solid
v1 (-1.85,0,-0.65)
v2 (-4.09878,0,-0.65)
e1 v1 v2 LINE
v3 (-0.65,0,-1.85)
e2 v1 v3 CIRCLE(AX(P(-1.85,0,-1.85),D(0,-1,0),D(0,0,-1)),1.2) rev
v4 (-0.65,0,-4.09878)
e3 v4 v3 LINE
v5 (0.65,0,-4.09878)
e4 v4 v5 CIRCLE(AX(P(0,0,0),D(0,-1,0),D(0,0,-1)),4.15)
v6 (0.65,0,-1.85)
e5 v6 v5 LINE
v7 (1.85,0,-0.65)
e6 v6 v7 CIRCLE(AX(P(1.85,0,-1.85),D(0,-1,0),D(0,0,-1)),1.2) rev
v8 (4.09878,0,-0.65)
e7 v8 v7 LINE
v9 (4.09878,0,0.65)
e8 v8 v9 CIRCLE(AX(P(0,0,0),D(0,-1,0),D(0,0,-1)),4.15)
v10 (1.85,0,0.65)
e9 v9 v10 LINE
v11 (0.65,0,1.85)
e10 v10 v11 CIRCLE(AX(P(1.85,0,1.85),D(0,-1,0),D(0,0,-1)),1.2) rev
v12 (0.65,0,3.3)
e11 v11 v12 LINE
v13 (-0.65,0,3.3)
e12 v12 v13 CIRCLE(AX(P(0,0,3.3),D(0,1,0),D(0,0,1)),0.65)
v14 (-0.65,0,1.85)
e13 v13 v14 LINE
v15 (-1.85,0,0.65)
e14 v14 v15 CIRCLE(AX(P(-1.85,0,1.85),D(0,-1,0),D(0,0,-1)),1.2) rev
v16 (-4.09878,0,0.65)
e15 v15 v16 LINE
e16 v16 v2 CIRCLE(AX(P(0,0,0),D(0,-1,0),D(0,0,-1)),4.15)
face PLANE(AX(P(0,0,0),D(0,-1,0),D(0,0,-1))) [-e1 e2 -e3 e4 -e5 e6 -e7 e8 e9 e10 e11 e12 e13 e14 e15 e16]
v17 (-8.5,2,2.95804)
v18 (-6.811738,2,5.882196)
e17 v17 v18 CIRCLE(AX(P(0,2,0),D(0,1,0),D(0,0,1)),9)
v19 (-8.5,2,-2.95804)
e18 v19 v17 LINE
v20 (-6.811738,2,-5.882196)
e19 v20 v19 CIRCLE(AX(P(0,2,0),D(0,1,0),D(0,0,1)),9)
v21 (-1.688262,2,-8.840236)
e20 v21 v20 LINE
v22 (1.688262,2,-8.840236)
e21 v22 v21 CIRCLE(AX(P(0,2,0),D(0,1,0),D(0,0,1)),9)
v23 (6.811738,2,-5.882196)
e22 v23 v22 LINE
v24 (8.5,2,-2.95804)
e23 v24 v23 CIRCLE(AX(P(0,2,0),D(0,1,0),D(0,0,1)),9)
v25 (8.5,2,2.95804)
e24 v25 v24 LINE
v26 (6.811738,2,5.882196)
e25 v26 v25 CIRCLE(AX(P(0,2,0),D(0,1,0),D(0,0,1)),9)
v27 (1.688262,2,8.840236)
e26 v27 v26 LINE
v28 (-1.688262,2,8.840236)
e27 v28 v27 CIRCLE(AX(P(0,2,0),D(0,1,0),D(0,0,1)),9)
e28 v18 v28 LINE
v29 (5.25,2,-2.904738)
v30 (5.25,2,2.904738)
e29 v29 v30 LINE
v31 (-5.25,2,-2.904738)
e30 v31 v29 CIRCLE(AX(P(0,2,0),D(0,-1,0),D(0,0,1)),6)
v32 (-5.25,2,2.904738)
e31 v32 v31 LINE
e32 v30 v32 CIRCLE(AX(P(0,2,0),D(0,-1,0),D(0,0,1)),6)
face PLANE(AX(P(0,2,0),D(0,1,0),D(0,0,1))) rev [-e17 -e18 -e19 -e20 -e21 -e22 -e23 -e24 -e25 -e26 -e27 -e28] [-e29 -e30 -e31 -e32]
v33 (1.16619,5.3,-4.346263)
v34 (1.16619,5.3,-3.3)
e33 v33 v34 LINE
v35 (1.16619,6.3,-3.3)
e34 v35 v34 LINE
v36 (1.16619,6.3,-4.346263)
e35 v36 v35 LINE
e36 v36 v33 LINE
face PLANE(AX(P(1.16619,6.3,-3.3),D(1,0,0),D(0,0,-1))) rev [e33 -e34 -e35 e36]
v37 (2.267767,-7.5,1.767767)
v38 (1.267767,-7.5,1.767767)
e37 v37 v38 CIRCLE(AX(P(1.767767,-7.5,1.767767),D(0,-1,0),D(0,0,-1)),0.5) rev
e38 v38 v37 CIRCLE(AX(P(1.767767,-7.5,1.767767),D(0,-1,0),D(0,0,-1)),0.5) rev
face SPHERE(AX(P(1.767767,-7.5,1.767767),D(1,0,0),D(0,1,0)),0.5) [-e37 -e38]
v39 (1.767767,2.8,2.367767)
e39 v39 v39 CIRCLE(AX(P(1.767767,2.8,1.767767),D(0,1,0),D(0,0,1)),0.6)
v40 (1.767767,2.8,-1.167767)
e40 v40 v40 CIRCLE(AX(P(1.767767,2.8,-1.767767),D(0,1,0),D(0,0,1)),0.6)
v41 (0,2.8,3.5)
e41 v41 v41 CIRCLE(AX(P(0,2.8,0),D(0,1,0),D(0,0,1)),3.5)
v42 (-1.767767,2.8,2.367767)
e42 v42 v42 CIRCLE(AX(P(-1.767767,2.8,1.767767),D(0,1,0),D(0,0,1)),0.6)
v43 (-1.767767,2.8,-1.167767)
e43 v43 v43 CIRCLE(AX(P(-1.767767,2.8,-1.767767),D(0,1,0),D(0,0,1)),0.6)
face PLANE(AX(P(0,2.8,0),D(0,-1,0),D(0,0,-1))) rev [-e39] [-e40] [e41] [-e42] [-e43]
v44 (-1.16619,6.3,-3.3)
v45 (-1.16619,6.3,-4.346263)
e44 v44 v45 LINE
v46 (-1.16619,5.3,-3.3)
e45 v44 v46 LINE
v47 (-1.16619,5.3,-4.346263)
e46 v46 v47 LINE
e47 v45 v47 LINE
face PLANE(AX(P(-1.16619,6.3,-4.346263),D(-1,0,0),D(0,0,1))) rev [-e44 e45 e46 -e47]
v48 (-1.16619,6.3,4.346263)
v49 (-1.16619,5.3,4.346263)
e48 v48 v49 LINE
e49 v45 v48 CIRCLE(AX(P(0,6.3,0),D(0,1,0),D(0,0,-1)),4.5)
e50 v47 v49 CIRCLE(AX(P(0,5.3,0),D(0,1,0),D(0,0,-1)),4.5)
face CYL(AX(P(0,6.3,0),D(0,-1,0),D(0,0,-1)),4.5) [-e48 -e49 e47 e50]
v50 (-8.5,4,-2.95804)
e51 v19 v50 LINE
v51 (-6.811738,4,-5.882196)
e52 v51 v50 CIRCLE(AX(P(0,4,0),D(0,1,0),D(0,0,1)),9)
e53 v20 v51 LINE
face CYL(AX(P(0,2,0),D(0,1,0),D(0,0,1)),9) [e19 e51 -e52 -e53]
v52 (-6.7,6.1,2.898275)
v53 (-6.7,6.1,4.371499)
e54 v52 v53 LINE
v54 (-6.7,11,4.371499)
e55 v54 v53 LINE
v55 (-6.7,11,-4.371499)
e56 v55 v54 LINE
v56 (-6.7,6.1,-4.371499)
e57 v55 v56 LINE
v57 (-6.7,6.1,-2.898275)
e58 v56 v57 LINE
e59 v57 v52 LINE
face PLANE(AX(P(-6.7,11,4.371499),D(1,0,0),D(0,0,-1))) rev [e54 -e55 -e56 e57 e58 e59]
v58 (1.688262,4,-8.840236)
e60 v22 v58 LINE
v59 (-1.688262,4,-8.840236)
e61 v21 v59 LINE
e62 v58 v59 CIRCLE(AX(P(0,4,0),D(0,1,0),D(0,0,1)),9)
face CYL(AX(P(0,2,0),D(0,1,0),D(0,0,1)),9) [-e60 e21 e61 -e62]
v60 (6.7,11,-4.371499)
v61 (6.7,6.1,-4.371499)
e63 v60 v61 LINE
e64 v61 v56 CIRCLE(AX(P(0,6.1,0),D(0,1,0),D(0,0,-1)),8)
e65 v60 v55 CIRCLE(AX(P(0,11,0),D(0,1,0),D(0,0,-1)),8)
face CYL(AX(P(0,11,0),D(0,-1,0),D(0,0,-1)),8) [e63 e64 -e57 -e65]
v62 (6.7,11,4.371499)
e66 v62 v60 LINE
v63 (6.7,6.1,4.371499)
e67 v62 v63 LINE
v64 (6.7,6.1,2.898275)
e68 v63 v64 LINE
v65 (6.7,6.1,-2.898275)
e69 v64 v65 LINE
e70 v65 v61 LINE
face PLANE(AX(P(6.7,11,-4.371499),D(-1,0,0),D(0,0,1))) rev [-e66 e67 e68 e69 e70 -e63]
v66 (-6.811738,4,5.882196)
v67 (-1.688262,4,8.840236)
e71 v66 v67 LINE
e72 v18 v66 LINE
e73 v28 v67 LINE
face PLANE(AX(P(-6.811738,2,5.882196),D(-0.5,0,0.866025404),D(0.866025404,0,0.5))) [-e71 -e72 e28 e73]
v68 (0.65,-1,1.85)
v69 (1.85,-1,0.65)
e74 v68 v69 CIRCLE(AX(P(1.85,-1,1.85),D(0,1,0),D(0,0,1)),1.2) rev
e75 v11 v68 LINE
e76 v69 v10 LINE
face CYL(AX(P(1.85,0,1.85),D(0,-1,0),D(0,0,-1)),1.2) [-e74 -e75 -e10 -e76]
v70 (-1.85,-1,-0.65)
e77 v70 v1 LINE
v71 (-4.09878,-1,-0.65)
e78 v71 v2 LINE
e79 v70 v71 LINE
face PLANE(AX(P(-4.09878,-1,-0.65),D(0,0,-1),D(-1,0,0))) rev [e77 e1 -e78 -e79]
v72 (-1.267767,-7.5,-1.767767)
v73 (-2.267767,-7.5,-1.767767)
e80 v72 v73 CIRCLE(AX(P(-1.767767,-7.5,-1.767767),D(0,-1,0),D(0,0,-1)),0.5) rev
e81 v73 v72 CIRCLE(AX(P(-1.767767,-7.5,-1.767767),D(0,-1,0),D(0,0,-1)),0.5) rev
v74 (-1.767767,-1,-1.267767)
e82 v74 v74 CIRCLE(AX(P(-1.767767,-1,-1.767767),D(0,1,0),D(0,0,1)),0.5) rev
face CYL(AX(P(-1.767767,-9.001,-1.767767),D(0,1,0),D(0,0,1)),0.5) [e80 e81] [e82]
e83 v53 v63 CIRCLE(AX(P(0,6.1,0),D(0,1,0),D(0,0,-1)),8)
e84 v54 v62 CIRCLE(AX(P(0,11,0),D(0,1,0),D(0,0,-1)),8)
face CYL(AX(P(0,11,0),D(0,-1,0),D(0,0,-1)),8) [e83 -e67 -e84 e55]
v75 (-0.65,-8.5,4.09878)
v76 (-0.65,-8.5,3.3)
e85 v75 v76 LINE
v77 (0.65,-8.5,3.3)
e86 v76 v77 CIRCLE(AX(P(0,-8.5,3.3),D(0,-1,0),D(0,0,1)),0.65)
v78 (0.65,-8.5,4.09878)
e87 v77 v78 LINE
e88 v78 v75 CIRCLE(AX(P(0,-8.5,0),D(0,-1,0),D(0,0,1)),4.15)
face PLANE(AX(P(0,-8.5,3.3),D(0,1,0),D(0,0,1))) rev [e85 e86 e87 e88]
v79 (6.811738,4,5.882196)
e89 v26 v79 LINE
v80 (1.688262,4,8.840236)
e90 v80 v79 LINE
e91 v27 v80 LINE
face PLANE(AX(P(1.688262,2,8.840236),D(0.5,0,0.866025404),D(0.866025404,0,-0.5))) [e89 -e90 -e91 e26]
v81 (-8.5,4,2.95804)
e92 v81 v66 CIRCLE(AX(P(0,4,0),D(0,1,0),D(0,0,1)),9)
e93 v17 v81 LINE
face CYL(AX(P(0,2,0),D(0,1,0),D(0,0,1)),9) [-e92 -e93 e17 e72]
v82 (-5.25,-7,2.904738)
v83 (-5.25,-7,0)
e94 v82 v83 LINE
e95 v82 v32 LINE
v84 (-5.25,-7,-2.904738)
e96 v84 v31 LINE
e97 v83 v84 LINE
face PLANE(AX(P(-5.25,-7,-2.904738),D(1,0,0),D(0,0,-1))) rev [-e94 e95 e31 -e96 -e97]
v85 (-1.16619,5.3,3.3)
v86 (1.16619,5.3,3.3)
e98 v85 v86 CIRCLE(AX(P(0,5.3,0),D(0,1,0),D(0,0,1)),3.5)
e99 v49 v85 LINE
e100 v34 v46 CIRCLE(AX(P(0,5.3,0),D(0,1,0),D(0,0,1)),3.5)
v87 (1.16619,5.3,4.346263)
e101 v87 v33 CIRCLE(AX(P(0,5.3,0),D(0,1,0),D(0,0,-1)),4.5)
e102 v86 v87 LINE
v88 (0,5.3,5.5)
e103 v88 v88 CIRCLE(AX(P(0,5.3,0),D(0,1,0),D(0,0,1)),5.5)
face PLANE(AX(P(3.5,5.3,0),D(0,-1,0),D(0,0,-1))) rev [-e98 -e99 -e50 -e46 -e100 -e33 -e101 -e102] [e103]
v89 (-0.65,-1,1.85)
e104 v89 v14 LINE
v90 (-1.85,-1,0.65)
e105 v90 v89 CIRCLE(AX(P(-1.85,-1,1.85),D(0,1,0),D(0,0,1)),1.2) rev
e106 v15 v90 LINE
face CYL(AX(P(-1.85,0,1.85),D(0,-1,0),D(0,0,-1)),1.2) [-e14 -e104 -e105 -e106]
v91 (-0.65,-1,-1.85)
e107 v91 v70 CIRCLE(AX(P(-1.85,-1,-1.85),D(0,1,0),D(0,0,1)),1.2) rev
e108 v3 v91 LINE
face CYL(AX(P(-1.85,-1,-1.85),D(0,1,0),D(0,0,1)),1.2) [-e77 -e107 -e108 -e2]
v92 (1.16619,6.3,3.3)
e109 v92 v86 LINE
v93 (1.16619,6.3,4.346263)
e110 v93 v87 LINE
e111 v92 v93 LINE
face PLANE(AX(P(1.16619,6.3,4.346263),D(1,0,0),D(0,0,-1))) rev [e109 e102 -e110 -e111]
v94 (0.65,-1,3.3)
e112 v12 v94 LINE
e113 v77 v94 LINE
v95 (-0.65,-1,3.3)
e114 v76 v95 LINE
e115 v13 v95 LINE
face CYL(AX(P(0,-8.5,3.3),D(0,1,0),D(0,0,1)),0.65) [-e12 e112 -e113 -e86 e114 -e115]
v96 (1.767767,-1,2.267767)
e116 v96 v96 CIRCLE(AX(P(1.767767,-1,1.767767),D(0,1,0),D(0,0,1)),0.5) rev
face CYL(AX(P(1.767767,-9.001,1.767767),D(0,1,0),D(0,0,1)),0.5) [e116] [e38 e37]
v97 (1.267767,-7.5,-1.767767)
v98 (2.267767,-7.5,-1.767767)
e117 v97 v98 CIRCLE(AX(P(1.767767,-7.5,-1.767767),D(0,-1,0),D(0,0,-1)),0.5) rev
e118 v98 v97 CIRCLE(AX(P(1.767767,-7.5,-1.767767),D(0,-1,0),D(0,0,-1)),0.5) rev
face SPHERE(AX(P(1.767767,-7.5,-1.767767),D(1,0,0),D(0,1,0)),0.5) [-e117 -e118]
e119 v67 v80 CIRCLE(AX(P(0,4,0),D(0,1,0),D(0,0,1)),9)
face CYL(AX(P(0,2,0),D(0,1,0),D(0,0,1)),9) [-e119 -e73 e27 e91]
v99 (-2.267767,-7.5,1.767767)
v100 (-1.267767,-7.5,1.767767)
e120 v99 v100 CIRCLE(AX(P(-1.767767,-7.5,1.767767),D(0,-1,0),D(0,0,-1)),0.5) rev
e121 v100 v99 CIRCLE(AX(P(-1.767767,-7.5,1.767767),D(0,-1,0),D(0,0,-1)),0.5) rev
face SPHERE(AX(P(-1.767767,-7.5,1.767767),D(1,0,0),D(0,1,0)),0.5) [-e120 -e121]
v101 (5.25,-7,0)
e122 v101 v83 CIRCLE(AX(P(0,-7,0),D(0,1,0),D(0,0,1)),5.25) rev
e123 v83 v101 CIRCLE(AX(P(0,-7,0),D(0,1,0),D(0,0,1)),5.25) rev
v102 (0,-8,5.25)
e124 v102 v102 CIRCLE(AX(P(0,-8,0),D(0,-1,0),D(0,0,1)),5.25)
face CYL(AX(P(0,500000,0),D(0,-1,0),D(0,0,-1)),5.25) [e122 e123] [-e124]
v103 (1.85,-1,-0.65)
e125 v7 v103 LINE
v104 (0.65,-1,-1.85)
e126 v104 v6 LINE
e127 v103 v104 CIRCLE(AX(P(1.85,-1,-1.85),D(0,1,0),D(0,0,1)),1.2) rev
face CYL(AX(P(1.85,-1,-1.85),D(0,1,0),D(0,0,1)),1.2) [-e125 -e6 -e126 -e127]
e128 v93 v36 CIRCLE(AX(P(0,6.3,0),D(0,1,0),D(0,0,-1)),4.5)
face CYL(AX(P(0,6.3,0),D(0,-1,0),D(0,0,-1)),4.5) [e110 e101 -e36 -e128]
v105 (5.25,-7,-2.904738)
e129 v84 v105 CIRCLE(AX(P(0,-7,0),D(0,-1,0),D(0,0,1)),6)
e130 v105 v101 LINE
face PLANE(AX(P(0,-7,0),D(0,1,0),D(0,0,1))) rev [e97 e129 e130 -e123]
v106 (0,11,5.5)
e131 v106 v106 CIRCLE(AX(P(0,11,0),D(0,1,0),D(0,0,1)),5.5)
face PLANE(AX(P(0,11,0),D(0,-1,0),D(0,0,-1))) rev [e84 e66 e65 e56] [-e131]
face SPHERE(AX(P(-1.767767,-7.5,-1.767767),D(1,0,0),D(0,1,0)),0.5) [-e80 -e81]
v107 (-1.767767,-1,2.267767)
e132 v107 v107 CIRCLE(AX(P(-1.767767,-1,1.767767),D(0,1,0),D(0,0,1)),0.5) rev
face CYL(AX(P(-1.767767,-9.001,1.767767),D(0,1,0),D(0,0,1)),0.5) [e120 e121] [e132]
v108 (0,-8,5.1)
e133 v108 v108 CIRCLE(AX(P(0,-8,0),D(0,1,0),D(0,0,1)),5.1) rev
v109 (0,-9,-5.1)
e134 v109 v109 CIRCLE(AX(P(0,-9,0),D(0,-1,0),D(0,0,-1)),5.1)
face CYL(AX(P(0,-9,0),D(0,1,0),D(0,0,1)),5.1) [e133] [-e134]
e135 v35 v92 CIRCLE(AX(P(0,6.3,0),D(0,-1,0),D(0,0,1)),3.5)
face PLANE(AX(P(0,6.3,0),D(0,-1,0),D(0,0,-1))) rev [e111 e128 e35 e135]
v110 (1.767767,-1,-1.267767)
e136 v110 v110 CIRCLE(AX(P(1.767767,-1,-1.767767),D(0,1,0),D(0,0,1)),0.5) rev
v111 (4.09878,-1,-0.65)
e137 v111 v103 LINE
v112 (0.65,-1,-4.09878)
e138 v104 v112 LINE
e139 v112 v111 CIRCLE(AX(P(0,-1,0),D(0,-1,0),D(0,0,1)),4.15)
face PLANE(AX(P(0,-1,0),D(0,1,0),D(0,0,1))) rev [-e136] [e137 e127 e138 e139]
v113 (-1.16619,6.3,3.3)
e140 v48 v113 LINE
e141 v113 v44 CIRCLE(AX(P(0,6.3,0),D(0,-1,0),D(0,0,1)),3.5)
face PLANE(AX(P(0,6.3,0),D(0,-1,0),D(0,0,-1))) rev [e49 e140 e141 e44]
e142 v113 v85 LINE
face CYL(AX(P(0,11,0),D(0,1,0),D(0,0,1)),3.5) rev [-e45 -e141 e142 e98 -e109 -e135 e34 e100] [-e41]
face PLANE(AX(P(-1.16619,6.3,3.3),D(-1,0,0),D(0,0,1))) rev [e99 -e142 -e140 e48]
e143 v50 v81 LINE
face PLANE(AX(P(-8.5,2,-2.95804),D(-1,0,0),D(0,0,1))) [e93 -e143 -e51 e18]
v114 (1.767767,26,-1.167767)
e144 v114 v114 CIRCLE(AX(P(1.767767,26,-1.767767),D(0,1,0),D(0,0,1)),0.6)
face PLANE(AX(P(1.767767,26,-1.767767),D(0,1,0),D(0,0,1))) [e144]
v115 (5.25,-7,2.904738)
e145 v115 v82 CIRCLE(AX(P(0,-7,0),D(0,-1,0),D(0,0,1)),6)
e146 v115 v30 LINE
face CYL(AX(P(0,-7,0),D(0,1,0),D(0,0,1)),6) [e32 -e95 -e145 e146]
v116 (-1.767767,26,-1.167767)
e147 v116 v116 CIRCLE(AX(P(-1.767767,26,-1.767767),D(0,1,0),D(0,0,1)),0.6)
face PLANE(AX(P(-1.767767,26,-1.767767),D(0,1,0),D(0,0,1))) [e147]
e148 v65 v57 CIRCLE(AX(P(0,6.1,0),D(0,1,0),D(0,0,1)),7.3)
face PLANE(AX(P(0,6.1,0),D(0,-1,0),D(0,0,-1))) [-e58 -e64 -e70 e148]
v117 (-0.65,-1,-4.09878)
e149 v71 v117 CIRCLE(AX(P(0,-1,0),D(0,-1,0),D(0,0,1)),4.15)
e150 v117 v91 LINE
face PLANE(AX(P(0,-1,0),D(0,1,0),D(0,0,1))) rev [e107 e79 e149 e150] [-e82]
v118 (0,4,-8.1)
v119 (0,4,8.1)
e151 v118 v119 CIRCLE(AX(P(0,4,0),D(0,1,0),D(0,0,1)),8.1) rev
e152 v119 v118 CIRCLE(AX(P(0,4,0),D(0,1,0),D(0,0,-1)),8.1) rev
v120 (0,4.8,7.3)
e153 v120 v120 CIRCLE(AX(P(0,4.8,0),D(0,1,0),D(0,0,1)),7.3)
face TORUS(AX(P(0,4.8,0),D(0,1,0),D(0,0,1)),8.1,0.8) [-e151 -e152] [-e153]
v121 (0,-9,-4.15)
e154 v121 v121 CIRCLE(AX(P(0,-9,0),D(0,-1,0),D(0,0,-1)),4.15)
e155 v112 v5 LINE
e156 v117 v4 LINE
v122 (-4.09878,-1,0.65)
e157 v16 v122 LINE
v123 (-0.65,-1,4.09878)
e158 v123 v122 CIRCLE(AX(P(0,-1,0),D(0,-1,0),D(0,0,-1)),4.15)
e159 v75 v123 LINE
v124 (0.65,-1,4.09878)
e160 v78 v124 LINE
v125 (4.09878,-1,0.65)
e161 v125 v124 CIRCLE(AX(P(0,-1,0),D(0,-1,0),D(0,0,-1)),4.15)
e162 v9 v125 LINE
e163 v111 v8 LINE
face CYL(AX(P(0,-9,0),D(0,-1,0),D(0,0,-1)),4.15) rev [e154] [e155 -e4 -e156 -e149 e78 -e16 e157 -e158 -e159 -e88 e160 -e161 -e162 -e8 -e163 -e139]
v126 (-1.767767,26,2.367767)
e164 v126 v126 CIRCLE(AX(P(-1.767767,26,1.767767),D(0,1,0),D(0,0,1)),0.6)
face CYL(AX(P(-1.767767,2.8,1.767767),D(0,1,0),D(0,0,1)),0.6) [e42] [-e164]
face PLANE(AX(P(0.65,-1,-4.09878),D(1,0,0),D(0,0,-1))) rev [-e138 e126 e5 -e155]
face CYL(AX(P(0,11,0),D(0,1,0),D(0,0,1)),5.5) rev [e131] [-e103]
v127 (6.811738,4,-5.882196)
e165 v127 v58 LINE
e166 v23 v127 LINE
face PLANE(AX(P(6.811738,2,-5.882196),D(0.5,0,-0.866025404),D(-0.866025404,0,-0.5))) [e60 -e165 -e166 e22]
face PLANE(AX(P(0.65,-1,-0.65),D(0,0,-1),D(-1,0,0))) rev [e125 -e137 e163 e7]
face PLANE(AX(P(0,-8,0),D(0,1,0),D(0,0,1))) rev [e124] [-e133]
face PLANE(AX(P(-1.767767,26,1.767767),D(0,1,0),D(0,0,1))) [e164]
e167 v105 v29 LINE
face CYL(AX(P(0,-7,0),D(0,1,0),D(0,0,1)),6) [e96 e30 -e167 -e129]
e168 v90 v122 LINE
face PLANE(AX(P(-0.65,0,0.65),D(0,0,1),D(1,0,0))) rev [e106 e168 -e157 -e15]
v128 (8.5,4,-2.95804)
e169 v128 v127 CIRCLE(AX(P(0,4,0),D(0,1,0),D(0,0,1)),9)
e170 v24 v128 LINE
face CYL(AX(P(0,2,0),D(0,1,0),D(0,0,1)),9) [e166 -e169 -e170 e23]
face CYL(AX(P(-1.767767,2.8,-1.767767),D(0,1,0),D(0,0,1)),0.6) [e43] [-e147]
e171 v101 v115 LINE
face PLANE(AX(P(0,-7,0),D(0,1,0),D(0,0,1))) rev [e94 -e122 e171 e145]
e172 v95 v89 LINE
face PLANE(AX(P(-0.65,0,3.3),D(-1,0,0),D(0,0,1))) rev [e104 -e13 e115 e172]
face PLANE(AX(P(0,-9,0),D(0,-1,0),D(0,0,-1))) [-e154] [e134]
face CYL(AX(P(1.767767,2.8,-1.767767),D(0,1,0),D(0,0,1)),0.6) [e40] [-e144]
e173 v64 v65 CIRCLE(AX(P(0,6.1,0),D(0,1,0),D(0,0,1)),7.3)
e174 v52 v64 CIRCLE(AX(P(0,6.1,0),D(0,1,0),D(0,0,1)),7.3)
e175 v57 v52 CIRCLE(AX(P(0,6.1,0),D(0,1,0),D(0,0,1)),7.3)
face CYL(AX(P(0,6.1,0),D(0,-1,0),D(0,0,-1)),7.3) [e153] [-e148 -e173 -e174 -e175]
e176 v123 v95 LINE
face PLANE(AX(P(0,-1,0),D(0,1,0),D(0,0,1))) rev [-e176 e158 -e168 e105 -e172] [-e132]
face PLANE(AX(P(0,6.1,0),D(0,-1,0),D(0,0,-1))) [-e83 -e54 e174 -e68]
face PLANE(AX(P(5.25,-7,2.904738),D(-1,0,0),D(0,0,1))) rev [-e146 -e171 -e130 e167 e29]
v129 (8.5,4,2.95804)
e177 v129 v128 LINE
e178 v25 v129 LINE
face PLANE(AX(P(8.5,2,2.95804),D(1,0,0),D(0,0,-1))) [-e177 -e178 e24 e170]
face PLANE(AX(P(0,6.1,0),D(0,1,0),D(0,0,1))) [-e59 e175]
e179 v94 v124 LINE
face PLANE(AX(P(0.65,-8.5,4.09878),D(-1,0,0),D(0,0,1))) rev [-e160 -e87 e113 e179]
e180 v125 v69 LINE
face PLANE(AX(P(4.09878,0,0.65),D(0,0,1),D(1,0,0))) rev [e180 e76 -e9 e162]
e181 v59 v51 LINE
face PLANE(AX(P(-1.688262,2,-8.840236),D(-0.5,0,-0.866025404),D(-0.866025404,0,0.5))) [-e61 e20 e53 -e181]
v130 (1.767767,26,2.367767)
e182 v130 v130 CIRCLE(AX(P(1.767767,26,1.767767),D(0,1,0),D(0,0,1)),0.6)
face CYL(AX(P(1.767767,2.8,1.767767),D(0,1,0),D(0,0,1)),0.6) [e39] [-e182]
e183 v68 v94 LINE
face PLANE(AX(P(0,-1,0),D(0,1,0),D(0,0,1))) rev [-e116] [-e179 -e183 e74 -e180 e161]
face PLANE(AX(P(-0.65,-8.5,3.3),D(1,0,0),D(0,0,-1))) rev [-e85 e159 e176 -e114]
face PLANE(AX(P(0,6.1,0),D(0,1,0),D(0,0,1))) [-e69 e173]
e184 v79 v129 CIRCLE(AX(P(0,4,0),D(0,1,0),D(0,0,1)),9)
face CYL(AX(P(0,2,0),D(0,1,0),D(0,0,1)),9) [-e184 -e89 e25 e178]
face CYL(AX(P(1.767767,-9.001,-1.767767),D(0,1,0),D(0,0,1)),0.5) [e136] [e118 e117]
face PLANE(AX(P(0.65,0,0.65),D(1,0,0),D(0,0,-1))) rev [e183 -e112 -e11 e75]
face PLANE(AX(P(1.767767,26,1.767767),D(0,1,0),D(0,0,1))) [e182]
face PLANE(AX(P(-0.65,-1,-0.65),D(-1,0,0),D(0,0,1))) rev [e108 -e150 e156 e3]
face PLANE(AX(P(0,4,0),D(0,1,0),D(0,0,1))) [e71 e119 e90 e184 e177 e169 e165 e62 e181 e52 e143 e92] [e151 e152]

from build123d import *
from build123d.topology import SkipClean

# Parameters (mm, degrees)
BOSS_EXTRUDE2_DEPTH                     = 4.9
BOSS_EXTRUDE3_DEPTH                     = 2
BOSS_EXTRUDE4_DEPTH                     = 9
BOSS_EXTRUDE5_REACH                     = 24.83
SKETCH5_R                               = 5.25
SKETCH6_R                               = 5.1
BOSS_EXTRUDE6_DEPTH                     = 1
F_8_3_8_3_DIAMETER_HOLE1_D              = 8.3
F_8_3_8_3_DIAMETER_HOLE1_DEPTH          = 8
BOSS_EXTRUDE7_DEPTH                     = 7.5
CUT_EXTRUDE1_START                      = -1
CUT_EXTRUDE1_DEPTH                      = 1
CBORE_FOR_M6_HEX_HEAD_BOLT1_D           = 7
CBORE_FOR_M6_HEX_HEAD_BOLT1_DEPTH       = 8.2
CBORE_FOR_M6_HEX_HEAD_BOLT1_CBORE_D     = 11
CBORE_FOR_M6_HEX_HEAD_BOLT1_CBORE_DEPTH = 5.7
BOSS_EXTRUDE8_DEPTH                     = 1
BOSS_EXTRUDE9_DEPTH                     = 1
BOSS_EXTRUDE10_DEPTH                    = 1
BOSS_EXTRUDE14_DEPTH                    = 1
SKETCH21_W                              = 0.6
SKETCH21_H                              = 23.2
SKETCH22_W                              = 0.6
SKETCH22_H                              = 23.2
SKETCH23_W                              = 0.6
SKETCH23_H                              = 23.2
SKETCH24_W                              = 0.6
SKETCH24_H                              = 23.2
FILLET1_R                               = 1.2


with BuildPart() as part:
    # Boss-Extrude1: read off the stored shape, not the designer's step
    # Boss-Extrude1 outline → Boss-Extrude1 (revolve)
    with BuildSketch(Plane.XY):
        with BuildLine():
            ThreePointArc((8.1, 4), (8.665685425, 5.365685425), (7.3, 4.8))
            Line((7.3, 4.8), (7.3, 6.1))
            Line((7.3, 6.1), (0, 6.1))
            Line((0, 6.1), (0, 4))
            Line((0, 4), (8.1, 4))
        make_face()
    revolve(axis=Axis((0, 0, 0), (0, 1, 0)))

    # Sketch2 → Boss-Extrude2 (add)
    with BuildSketch(Plane(origin=(0, 6.1, 0), x_dir=(-1, 0, 0), z_dir=(0, 1, 0))):
        with BuildLine():
            Line((-6.7, -4.371498599), (-6.7, 4.371498599))
            ThreePointArc((-6.7, 4.371498599), (0, 8), (6.7, 4.371498599))
            Line((6.7, 4.371498599), (6.7, -4.371498599))
            ThreePointArc((6.7, -4.371498599), (0, -8), (-6.7, -4.371498599))
        make_face()
    extrude(amount=BOSS_EXTRUDE2_DEPTH)

    # Sketch3 → Boss-Extrude3 (add)
    with BuildSketch(Plane(origin=(0, 4, 0), x_dir=(1, 0, 0), z_dir=(0, 1, 0))):
        with BuildLine():
            Line((1.688262309, -8.840235878), (6.811737691, -5.882195986))
            ThreePointArc((6.811737691, -5.882195986), (7.794228634, -4.5), (8.5, -2.958039892))
            Line((8.5, -2.958039892), (8.5, 2.958039892))
            ThreePointArc((8.5, 2.958039892), (7.794228634, 4.5), (6.811737691, 5.882195986))
            Line((6.811737691, 5.882195986), (1.688262309, 8.840235878))
            ThreePointArc((1.688262309, 8.840235878), (0, 9), (-1.688262309, 8.840235878))
            Line((-1.688262309, 8.840235878), (-6.811737691, 5.882195986))
            ThreePointArc((-6.811737691, 5.882195986), (-7.794228634, 4.5), (-8.5, 2.958039892))
            Line((-8.5, 2.958039892), (-8.5, -2.958039892))
            ThreePointArc((-8.5, -2.958039892), (-7.794228634, -4.5), (-6.811737691, -5.882195986))
            Line((-6.811737691, -5.882195986), (-1.688262309, -8.840235878))
            ThreePointArc((-1.688262309, -8.840235878), (0, -9), (1.688262309, -8.840235878))
        make_face()
    extrude(amount=-BOSS_EXTRUDE3_DEPTH)

    # Sketch4 → Boss-Extrude4 (add)
    with BuildSketch(Plane.XZ.offset(-2)):
        with BuildLine():
            Line((-5.25, -2.90473751), (-5.25, 2.90473751))
            ThreePointArc((-5.25, 2.90473751), (0, 6), (5.25, 2.90473751))
            Line((5.25, 2.90473751), (5.25, -2.90473751))
            ThreePointArc((5.25, -2.90473751), (0, -6), (-5.25, -2.90473751))
        make_face()
    extrude(amount=BOSS_EXTRUDE4_DEPTH)

    # Sketch5 → Boss-Extrude5 (add, up to next)
    with BuildSketch(Plane.XZ.offset(8), mode=Mode.PRIVATE) as boss_extrude5_sk1:
        Circle(SKETCH5_R)
    boss_extrude5_tool1 = extrude(boss_extrude5_sk1.sketch, amount=-BOSS_EXTRUDE5_REACH, mode=Mode.PRIVATE) - part.part
    add(boss_extrude5_tool1.solids().sort_by_distance((0, -8, 0))[0])

    # Sketch6 → Boss-Extrude6 (add)
    with BuildSketch(Plane.XZ.offset(8)):
        with Locations(Location((0, 0, 0), (0, 0, 90))):
            Circle(SKETCH6_R)
    extrude(amount=BOSS_EXTRUDE6_DEPTH)

    # Ø8.3 (8.3) Diameter Hole1
    with Locations(Plane(origin=(0, -9, 0), x_dir=(-1, 0, 0), z_dir=(0, -1, 0))):
        with Locations((0, 0)):
            Hole(F_8_3_8_3_DIAMETER_HOLE1_D / 2, depth=F_8_3_8_3_DIAMETER_HOLE1_DEPTH)

    # Sketch9 → Boss-Extrude7 (add)
    with BuildSketch(Plane.XZ.offset(1)):
        with BuildLine():
            Line((-0.65, 3.3), (-0.65, 4.098780306))
            ThreePointArc((-0.65, 4.098780306), (0, 4.15), (0.65, 4.098780306))
            Line((0.65, 4.098780306), (0.65, 3.3))
            ThreePointArc((0.65, 3.3), (0, 2.65), (-0.65, 3.3))
        make_face()
    extrude(amount=BOSS_EXTRUDE7_DEPTH)

    # Sketch10 → Cut-Extrude1 (cut)
    with SkipClean():  # the faces are left unmerged after this step: merging them gives an invalid solid
        with BuildSketch(Plane.XZ.offset(1).offset(CUT_EXTRUDE1_START)):
            with BuildLine():
                Line((-0.65, 0.65), (-4.098780306, 0.65))
                ThreePointArc((-4.098780306, 0.65), (0, -4.15), (4.098780306, 0.65))
                Line((4.098780306, 0.65), (0.65, 0.65))
                Line((0.65, 0.65), (0.65, 3.3))
                ThreePointArc((0.65, 3.3), (0, 2.65), (-0.65, 3.3))
                Line((-0.65, 3.3), (-0.65, 0.65))
            make_face()
        extrude(amount=CUT_EXTRUDE1_DEPTH, mode=Mode.SUBTRACT)

    # CBORE for M6 Hex Head Bolt1
    with Locations(Plane(origin=(0, 11, 0), x_dir=(1, 0, 0), z_dir=(0, 1, 0))):
        with Locations((0, 0)):
            CounterBoreHole(CBORE_FOR_M6_HEX_HEAD_BOLT1_D / 2, CBORE_FOR_M6_HEX_HEAD_BOLT1_CBORE_D / 2, CBORE_FOR_M6_HEX_HEAD_BOLT1_CBORE_DEPTH, depth=CBORE_FOR_M6_HEX_HEAD_BOLT1_DEPTH)

    # Sketch13 → Boss-Extrude8 (add)
    with BuildSketch(Plane(origin=(0, 5.3, 0), x_dir=(-1, 0, 0), z_dir=(0, 1, 0))):
        with BuildLine():
            Line((-1.166190379, 4.346262762), (-1.166190379, 3.3))
            ThreePointArc((-1.166190379, 3.3), (-3.5, 0), (-1.166190379, -3.3))
            Line((-1.166190379, -3.3), (-1.166190379, -4.346262762))
            ThreePointArc((-1.166190379, -4.346262762), (-4.5, 0), (-1.166190379, 4.346262762))
        make_face()
    extrude(amount=BOSS_EXTRUDE8_DEPTH)

    # Sketch14 → Boss-Extrude9 (add)
    with SkipClean():  # the faces are left unmerged after this step: merging them gives an invalid solid
        with BuildSketch(Plane(origin=(0, 5.3, 0), x_dir=(-1, 0, 0), z_dir=(0, 1, 0))):
            with BuildLine():
                Line((1.166190379, -4.346262762), (1.166190379, -3.3))
                ThreePointArc((1.166190379, -3.3), (3.5, 0), (1.166190379, 3.3))
                Line((1.166190379, 3.3), (1.166190379, 4.346262762))
                ThreePointArc((1.166190379, 4.346262762), (4.5, 0), (1.166190379, -4.346262762))
            make_face()
        extrude(amount=BOSS_EXTRUDE9_DEPTH)
    add(part.part.scale(1), mode=Mode.REPLACE)  # the faces are merged on a copy

    # Sketch15 → Boss-Extrude10 (add)
    with BuildSketch(Plane.XZ):
        with BuildLine():
            Line((0.65, -0.65), (4.098780306, -0.65))
            ThreePointArc((4.098780306, -0.65), (2.934493142, -2.934493142), (0.65, -4.098780306))
            Line((0.65, -4.098780306), (0.65, -0.65))
        make_face()
    extrude(amount=BOSS_EXTRUDE10_DEPTH)

    # Boss-Extrude11: read off the stored shape, not the designer's step
    # Boss-Extrude11 outline → Boss-Extrude11 (revolve)
    with BuildSketch(Plane(origin=(1.767766953, 0, -1.767766953), x_dir=(1, 0, 0), z_dir=(0, 0, 1))):
        with BuildLine():
            Line((0, -1), (0, -8))
            ThreePointArc((0, -8), (0.353553391, -7.853553391), (0.5, -7.5))
            Line((0.5, -7.5), (0.5, -1))
            Line((0.5, -1), (0, -1))
        make_face()
    revolve(axis=Axis((1.767766953, 0, -1.767766953), (0, 1, 0)))

    # Boss-Extrude12: read off the stored shape, not the designer's step
    # Boss-Extrude12 outline → Boss-Extrude12 (revolve)
    with BuildSketch(Plane(origin=(1.767766953, 0, 1.767766953), x_dir=(1, 0, 0), z_dir=(0, 0, 1))):
        with BuildLine():
            Line((0, -1), (0, -8))
            ThreePointArc((0, -8), (0.353553391, -7.853553391), (0.5, -7.5))
            Line((0.5, -7.5), (0.5, -1))
            Line((0.5, -1), (0, -1))
        make_face()
    revolve(axis=Axis((1.767766953, 0, 1.767766953), (0, 1, 0)))

    # Boss-Extrude13: read off the stored shape, not the designer's step
    # Boss-Extrude13 outline → Boss-Extrude13 (revolve)
    with BuildSketch(Plane(origin=(-1.767766953, 0, 1.767766953), x_dir=(1, 0, 0), z_dir=(0, 0, 1))):
        with BuildLine():
            Line((0, -1), (0, -8))
            ThreePointArc((0, -8), (0.353553391, -7.853553391), (0.5, -7.5))
            Line((0.5, -7.5), (0.5, -1))
            Line((0.5, -1), (0, -1))
        make_face()
    revolve(axis=Axis((-1.767766953, 0, 1.767766953), (0, 1, 0)))

    # Sketch19 → Boss-Extrude14 (add)
    with BuildSketch(Plane.XZ):
        with BuildLine():
            Line((-0.65, -0.65), (-0.65, -4.098780306))
            ThreePointArc((-0.65, -4.098780306), (-2.934493142, -2.934493142), (-4.098780306, -0.65))
            Line((-4.098780306, -0.65), (-0.65, -0.65))
        make_face()
    extrude(amount=BOSS_EXTRUDE14_DEPTH)

    # Boss-Extrude15: read off the stored shape, not the designer's step
    # Boss-Extrude15 outline → Boss-Extrude15 (revolve)
    with BuildSketch(Plane(origin=(-1.767766953, 0, -1.767766953), x_dir=(1, 0, 0), z_dir=(0, 0, 1))):
        with BuildLine():
            Line((0, -1), (0, -8))
            ThreePointArc((0, -8), (0.353553391, -7.853553391), (0.5, -7.5))
            Line((0.5, -7.5), (0.5, -1))
            Line((0.5, -1), (0, -1))
        make_face()
    revolve(axis=Axis((-1.767766953, 0, -1.767766953), (0, 1, 0)))

    # Sketch21 → Revolve1 (revolve)
    with BuildSketch(Plane(origin=(0, 0, 1.767766953), x_dir=(-1, 0, 0), z_dir=(0, 0, -1)), mode=Mode.PRIVATE) as revolve1_sk:
        with Locations((1.467766953, 14.4)):
            Rectangle(SKETCH21_W, SKETCH21_H)
    revolve(revolve1_sk.sketch.rotate(Axis((-1.767766953, 2.8, 1.767766953), (0, 1, 0)), 270), axis=Axis((-1.767766953, 2.8, 1.767766953), (0, 1, 0)))

    # Sketch22 → Revolve2 (revolve)
    with BuildSketch(Plane(origin=(0, 0, 1.767766953), x_dir=(-1, 0, 0), z_dir=(0, 0, -1)), mode=Mode.PRIVATE) as revolve2_sk:
        with Locations((-2.067766953, 14.4)):
            Rectangle(SKETCH22_W, SKETCH22_H)
    revolve(revolve2_sk.sketch.rotate(Axis((1.767766953, 2.8, 1.767766953), (0, 1, 0)), 270), axis=Axis((1.767766953, 2.8, 1.767766953), (0, 1, 0)))

    # Sketch23 → Revolve3 (revolve)
    with BuildSketch(Plane(origin=(0, 0, -1.767766953), x_dir=(-1, 0, 0), z_dir=(0, 0, -1)), mode=Mode.PRIVATE) as revolve3_sk:
        with Locations((-2.067766953, 14.4)):
            Rectangle(SKETCH23_W, SKETCH23_H)
    revolve(revolve3_sk.sketch.rotate(Axis((1.767766953, 2.8, -1.767766953), (0, 1, 0)), 270), axis=Axis((1.767766953, 2.8, -1.767766953), (0, 1, 0)))

    # Sketch24 → Revolve4 (revolve)
    with BuildSketch(Plane(origin=(0, 0, -1.767766953), x_dir=(-1, 0, 0), z_dir=(0, 0, -1)), mode=Mode.PRIVATE) as revolve4_sk:
        with Locations((1.467766953, 14.4)):
            Rectangle(SKETCH24_W, SKETCH24_H)
    revolve(revolve4_sk.sketch.rotate(Axis((-1.767766953, 2.8, -1.767766953), (0, 1, 0)), 270), axis=Axis((-1.767766953, 2.8, -1.767766953), (0, 1, 0)))

    # Fillet1
    fillet1_edges = [part.edges().sort_by_distance(p)[0] for p in [
        (-0.65, -0.5, -0.65),
        (-0.65, -0.5, 0.65),
        (0.65, -0.5, -0.65),
        (0.65, -0.5, 0.65),
    ]]
    fillet(fillet1_edges, radius=FILLET1_R)


solid = part.part
